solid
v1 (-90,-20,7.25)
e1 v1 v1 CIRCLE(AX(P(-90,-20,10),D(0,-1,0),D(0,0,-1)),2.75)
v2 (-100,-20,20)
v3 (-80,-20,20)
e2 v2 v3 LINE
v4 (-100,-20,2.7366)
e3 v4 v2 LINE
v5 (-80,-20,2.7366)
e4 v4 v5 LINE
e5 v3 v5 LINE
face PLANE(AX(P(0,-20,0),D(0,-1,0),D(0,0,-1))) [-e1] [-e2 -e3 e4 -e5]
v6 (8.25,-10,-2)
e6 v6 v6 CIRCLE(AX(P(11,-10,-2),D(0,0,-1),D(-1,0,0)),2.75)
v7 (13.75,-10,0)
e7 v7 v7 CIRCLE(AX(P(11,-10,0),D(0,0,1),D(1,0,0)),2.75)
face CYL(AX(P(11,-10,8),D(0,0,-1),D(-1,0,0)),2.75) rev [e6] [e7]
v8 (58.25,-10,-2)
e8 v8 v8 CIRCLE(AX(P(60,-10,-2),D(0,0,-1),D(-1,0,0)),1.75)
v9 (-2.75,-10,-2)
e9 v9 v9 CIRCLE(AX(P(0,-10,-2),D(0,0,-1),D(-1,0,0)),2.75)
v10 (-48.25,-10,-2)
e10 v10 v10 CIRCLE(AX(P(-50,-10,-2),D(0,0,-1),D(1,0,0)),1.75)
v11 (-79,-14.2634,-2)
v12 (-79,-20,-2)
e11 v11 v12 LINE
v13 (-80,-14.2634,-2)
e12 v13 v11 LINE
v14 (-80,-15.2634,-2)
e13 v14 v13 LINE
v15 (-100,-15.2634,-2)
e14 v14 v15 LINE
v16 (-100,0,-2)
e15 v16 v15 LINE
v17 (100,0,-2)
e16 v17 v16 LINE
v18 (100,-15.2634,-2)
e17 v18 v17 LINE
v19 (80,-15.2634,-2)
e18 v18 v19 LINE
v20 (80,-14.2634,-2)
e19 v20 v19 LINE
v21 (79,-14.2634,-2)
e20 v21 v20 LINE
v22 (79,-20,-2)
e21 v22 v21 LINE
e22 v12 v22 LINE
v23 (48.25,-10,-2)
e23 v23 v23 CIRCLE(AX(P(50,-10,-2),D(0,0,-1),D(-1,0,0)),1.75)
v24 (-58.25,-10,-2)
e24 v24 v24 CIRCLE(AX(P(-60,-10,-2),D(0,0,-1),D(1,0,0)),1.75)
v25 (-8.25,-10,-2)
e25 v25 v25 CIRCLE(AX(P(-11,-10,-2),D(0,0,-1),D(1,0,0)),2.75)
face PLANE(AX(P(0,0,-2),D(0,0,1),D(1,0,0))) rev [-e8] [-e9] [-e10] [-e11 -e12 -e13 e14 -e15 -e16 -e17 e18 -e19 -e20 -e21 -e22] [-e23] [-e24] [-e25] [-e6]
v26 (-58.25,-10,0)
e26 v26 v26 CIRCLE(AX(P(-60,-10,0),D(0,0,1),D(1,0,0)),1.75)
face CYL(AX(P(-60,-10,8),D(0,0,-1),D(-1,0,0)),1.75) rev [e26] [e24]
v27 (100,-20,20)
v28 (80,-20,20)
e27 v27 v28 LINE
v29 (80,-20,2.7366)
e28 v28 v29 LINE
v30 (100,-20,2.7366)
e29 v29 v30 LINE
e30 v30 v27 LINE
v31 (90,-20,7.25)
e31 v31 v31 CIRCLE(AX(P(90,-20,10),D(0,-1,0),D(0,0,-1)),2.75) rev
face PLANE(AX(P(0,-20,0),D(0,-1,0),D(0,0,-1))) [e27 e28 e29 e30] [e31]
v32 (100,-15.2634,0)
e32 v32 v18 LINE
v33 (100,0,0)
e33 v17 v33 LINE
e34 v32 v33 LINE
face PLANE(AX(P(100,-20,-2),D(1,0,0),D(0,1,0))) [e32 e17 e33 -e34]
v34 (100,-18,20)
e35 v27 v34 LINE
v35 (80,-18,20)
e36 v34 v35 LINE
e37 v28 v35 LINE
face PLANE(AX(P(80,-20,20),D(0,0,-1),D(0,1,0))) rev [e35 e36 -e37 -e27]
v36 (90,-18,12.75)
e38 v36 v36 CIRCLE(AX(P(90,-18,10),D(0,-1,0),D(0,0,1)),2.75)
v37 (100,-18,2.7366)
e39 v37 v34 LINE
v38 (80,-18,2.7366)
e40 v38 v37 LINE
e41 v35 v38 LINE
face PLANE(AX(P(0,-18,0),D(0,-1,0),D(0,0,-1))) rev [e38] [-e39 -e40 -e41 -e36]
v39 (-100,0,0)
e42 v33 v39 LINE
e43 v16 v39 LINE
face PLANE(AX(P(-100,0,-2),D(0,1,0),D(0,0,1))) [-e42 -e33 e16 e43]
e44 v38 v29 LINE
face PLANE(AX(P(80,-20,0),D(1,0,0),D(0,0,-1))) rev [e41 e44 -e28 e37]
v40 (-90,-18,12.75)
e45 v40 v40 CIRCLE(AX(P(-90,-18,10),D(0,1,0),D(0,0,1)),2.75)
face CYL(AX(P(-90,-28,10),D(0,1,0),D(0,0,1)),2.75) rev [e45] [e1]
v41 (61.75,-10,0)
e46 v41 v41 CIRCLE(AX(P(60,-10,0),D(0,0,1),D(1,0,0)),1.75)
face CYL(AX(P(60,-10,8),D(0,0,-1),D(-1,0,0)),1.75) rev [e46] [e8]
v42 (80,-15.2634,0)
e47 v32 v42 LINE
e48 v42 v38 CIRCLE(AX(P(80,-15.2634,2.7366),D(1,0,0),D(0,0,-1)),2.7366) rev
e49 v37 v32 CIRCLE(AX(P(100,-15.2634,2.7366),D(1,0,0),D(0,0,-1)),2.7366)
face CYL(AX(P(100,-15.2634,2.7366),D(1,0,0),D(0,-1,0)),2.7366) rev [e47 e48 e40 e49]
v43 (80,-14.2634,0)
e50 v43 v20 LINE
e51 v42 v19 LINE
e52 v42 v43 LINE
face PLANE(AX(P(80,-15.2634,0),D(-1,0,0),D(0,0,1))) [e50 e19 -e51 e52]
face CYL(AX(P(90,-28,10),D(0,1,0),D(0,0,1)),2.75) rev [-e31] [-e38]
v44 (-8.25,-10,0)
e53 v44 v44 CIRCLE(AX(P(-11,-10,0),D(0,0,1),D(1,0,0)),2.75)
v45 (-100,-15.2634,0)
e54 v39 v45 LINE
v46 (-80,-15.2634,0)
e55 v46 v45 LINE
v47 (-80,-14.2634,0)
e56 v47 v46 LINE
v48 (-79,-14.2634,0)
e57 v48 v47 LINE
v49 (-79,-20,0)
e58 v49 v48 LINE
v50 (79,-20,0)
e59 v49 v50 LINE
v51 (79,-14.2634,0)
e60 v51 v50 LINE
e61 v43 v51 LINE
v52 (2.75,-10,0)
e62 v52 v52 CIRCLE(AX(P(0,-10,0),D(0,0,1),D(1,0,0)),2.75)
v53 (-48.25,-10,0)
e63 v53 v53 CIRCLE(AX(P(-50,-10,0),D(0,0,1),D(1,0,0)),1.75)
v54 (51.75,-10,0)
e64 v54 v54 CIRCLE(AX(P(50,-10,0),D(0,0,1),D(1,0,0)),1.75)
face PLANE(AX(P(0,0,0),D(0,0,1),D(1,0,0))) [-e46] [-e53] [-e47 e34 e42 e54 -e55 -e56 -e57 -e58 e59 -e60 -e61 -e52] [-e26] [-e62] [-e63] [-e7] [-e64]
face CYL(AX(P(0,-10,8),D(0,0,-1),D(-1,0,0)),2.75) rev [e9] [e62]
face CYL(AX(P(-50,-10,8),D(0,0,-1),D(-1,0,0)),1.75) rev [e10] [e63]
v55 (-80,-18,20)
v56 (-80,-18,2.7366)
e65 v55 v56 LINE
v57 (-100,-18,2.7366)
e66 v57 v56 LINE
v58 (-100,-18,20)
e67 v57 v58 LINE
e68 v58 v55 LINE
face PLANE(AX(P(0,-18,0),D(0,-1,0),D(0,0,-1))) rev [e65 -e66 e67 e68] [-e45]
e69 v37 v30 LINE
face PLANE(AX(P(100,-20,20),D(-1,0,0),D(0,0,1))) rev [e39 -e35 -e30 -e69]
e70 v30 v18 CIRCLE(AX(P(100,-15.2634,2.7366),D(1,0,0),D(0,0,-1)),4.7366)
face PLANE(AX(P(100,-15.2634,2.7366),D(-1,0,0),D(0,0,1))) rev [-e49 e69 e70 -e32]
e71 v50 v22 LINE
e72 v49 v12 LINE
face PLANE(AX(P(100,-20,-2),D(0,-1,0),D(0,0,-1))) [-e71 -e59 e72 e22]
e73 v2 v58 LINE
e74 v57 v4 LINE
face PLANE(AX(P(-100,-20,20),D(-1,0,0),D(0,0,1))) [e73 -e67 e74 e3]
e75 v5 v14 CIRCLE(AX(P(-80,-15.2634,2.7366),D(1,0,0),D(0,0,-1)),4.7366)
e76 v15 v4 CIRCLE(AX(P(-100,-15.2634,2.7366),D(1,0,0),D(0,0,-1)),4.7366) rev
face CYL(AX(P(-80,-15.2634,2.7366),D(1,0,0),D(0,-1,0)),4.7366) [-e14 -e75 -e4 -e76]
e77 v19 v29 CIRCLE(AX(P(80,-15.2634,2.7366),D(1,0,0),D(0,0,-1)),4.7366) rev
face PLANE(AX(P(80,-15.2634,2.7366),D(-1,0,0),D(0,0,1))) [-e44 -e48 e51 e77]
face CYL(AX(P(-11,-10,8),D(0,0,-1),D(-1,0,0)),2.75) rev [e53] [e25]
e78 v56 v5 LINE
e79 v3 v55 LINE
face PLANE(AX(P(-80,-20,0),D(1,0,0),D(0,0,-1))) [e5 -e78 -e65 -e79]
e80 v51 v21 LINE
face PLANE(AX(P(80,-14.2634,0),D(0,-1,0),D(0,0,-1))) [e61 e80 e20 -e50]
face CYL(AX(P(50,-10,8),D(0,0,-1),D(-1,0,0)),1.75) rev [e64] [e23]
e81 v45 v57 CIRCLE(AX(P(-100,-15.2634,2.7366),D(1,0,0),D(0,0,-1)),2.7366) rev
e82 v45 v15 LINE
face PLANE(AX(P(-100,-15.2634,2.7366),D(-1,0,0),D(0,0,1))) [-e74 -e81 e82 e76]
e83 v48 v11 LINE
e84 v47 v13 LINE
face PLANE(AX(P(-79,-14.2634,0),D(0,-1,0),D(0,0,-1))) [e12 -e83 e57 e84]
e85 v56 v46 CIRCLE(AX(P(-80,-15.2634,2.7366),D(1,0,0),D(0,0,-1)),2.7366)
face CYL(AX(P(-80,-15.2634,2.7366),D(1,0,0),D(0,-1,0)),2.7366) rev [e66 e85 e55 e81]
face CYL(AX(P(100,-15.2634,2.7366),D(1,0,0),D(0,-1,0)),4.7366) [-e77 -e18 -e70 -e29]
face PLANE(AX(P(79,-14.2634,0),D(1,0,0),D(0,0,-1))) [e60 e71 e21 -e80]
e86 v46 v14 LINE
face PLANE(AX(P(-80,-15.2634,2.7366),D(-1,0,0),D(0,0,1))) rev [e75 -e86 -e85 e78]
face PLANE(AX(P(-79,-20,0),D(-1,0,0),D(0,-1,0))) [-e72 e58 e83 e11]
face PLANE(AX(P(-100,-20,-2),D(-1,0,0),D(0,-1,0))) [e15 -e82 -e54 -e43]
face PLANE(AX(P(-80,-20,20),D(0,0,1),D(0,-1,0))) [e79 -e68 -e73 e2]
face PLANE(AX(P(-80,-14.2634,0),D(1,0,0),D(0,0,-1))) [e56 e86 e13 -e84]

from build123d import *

# Parameters (mm, degrees)
SKETCH_1_W                        = 200
SKETCH_1_H                        = 20
SM_BASE_FLANGE_1_DEPTH            = 2
SM_EDGE_FLANGE_1_STRIP_W          = 13.4732
SM_EDGE_FLANGE_1_STRIP_H          = 2
SM_EDGE_FLANGE_1_STRIP_CUT_DEPTH  = 20
SM_EDGE_FLANGE_1_RELIEF_W         = 14.4732
SM_EDGE_FLANGE_1_RELIEF_H         = 1
SM_EDGE_FLANGE_1_RELIEF_CUT_DEPTH = 2
SM_EDGE_FLANGE_1_DEPTH            = 20
SKETCH_10_R                       = 2.75
CUT_EXTRUDE_2_DEPTH               = 10
SKETCH_11_R                       = 2.75
SKETCH_11_R_2                     = 1.75
CUT_EXTRUDE_3_DEPTH               = 10


# Sheet-metal steps are written as plain solids
with BuildPart() as part:
    # Sketch 1 → 基体-法兰1 (new body)
    with BuildSketch(Plane.XY):
        with Locations((0, -10)):
            Rectangle(SKETCH_1_W, SKETCH_1_H)
    extrude(amount=-SM_BASE_FLANGE_1_DEPTH)

    # 边线-法兰1 strip (across the edge) → 边线-法兰1 strip cut (cut)
    with BuildSketch(Plane(origin=(-100, -20, 0), x_dir=(0, 1, 0), z_dir=(1, 0, 0))):
        with Locations((-2, -1)):
            Rectangle(SM_EDGE_FLANGE_1_STRIP_W, SM_EDGE_FLANGE_1_STRIP_H)
    sm_edge_flange_1_strip_cut = extrude(amount=SM_EDGE_FLANGE_1_STRIP_CUT_DEPTH, mode=Mode.SUBTRACT)

    # 边线-法兰1 relief (on the sheet) → 边线-法兰1 relief cut (cut)
    with BuildSketch(Plane(origin=(-100, -15.2634, 0), x_dir=(0, 1, 0), z_dir=(0, 0, 1))):
        with Locations((-6.2366, -20.5)):
            Rectangle(SM_EDGE_FLANGE_1_RELIEF_W, SM_EDGE_FLANGE_1_RELIEF_H)
    sm_edge_flange_1_relief_cut = extrude(amount=-SM_EDGE_FLANGE_1_RELIEF_CUT_DEPTH, mode=Mode.SUBTRACT)

    # 边线-法兰1 section (across the edge) → 边线-法兰1 (add)
    with BuildSketch(Plane(origin=(-100, -20, 0), x_dir=(0, 1, 0), z_dir=(1, 0, 0))):
        with BuildLine():
            Line((0, 2.7366), (0, 20))
            Line((0, 20), (2, 20))
            Line((2, 20), (2, 2.7366))
            ThreePointArc((2, 2.7366), (2.801531583, 0.801531583), (4.7366, 0))
            Line((4.7366, 0), (4.7366, -2))
            ThreePointArc((4.7366, -2), (1.38731802, -0.61268198), (0, 2.7366))
        make_face()
    sm_edge_flange_1 = extrude(amount=SM_EDGE_FLANGE_1_DEPTH)

    # 草图10 → 切除-拉伸2 (cut)
    with BuildSketch(Plane(origin=(0, -18, 0), x_dir=(1, 0, 0), z_dir=(0, 1, 0))):
        with Locations(Location((-90, -10, 0), (0, 0, 270))):
            Circle(SKETCH_10_R)
    cut_extrude_2 = extrude(amount=-CUT_EXTRUDE_2_DEPTH, mode=Mode.SUBTRACT)

    # 镜向1: 边线-法兰1 strip cut, 边线-法兰1 relief cut, 边线-法兰1, 切除-拉伸2 across plane
    add(sm_edge_flange_1_strip_cut.mirror(Plane(origin=(0, 0, 0), x_dir=(0, 0, 1), z_dir=(1, 0, 0))), mode=Mode.SUBTRACT)
    add(sm_edge_flange_1_relief_cut.mirror(Plane(origin=(0, 0, 0), x_dir=(0, 0, 1), z_dir=(1, 0, 0))), mode=Mode.SUBTRACT)
    add(sm_edge_flange_1.mirror(Plane(origin=(0, 0, 0), x_dir=(0, 0, 1), z_dir=(1, 0, 0))))
    add(cut_extrude_2.mirror(Plane(origin=(0, 0, 0), x_dir=(0, 0, 1), z_dir=(1, 0, 0))), mode=Mode.SUBTRACT)

    # 草图11 → 切除-拉伸3 (cut)
    with BuildSketch(Plane(origin=(0, 0, -2), x_dir=(-1, 0, 0), z_dir=(0, 0, -1))):
        with Locations((0, -10)):
            Circle(SKETCH_11_R)
        with Locations((-11, -10)):
            Circle(SKETCH_11_R)
        with Locations(Location((11, -10, 0), (0, 0, 180))):
            Circle(SKETCH_11_R)
        with Locations((-60, -10)):
            Circle(SKETCH_11_R_2)
        with Locations((-50, -10)):
            Circle(SKETCH_11_R_2)
        with Locations(Location((60, -10, 0), (0, 0, 180))):
            Circle(SKETCH_11_R_2)
        with Locations(Location((50, -10, 0), (0, 0, 180))):
            Circle(SKETCH_11_R_2)
    extrude(amount=-CUT_EXTRUDE_3_DEPTH, mode=Mode.SUBTRACT)


solid = part.part
